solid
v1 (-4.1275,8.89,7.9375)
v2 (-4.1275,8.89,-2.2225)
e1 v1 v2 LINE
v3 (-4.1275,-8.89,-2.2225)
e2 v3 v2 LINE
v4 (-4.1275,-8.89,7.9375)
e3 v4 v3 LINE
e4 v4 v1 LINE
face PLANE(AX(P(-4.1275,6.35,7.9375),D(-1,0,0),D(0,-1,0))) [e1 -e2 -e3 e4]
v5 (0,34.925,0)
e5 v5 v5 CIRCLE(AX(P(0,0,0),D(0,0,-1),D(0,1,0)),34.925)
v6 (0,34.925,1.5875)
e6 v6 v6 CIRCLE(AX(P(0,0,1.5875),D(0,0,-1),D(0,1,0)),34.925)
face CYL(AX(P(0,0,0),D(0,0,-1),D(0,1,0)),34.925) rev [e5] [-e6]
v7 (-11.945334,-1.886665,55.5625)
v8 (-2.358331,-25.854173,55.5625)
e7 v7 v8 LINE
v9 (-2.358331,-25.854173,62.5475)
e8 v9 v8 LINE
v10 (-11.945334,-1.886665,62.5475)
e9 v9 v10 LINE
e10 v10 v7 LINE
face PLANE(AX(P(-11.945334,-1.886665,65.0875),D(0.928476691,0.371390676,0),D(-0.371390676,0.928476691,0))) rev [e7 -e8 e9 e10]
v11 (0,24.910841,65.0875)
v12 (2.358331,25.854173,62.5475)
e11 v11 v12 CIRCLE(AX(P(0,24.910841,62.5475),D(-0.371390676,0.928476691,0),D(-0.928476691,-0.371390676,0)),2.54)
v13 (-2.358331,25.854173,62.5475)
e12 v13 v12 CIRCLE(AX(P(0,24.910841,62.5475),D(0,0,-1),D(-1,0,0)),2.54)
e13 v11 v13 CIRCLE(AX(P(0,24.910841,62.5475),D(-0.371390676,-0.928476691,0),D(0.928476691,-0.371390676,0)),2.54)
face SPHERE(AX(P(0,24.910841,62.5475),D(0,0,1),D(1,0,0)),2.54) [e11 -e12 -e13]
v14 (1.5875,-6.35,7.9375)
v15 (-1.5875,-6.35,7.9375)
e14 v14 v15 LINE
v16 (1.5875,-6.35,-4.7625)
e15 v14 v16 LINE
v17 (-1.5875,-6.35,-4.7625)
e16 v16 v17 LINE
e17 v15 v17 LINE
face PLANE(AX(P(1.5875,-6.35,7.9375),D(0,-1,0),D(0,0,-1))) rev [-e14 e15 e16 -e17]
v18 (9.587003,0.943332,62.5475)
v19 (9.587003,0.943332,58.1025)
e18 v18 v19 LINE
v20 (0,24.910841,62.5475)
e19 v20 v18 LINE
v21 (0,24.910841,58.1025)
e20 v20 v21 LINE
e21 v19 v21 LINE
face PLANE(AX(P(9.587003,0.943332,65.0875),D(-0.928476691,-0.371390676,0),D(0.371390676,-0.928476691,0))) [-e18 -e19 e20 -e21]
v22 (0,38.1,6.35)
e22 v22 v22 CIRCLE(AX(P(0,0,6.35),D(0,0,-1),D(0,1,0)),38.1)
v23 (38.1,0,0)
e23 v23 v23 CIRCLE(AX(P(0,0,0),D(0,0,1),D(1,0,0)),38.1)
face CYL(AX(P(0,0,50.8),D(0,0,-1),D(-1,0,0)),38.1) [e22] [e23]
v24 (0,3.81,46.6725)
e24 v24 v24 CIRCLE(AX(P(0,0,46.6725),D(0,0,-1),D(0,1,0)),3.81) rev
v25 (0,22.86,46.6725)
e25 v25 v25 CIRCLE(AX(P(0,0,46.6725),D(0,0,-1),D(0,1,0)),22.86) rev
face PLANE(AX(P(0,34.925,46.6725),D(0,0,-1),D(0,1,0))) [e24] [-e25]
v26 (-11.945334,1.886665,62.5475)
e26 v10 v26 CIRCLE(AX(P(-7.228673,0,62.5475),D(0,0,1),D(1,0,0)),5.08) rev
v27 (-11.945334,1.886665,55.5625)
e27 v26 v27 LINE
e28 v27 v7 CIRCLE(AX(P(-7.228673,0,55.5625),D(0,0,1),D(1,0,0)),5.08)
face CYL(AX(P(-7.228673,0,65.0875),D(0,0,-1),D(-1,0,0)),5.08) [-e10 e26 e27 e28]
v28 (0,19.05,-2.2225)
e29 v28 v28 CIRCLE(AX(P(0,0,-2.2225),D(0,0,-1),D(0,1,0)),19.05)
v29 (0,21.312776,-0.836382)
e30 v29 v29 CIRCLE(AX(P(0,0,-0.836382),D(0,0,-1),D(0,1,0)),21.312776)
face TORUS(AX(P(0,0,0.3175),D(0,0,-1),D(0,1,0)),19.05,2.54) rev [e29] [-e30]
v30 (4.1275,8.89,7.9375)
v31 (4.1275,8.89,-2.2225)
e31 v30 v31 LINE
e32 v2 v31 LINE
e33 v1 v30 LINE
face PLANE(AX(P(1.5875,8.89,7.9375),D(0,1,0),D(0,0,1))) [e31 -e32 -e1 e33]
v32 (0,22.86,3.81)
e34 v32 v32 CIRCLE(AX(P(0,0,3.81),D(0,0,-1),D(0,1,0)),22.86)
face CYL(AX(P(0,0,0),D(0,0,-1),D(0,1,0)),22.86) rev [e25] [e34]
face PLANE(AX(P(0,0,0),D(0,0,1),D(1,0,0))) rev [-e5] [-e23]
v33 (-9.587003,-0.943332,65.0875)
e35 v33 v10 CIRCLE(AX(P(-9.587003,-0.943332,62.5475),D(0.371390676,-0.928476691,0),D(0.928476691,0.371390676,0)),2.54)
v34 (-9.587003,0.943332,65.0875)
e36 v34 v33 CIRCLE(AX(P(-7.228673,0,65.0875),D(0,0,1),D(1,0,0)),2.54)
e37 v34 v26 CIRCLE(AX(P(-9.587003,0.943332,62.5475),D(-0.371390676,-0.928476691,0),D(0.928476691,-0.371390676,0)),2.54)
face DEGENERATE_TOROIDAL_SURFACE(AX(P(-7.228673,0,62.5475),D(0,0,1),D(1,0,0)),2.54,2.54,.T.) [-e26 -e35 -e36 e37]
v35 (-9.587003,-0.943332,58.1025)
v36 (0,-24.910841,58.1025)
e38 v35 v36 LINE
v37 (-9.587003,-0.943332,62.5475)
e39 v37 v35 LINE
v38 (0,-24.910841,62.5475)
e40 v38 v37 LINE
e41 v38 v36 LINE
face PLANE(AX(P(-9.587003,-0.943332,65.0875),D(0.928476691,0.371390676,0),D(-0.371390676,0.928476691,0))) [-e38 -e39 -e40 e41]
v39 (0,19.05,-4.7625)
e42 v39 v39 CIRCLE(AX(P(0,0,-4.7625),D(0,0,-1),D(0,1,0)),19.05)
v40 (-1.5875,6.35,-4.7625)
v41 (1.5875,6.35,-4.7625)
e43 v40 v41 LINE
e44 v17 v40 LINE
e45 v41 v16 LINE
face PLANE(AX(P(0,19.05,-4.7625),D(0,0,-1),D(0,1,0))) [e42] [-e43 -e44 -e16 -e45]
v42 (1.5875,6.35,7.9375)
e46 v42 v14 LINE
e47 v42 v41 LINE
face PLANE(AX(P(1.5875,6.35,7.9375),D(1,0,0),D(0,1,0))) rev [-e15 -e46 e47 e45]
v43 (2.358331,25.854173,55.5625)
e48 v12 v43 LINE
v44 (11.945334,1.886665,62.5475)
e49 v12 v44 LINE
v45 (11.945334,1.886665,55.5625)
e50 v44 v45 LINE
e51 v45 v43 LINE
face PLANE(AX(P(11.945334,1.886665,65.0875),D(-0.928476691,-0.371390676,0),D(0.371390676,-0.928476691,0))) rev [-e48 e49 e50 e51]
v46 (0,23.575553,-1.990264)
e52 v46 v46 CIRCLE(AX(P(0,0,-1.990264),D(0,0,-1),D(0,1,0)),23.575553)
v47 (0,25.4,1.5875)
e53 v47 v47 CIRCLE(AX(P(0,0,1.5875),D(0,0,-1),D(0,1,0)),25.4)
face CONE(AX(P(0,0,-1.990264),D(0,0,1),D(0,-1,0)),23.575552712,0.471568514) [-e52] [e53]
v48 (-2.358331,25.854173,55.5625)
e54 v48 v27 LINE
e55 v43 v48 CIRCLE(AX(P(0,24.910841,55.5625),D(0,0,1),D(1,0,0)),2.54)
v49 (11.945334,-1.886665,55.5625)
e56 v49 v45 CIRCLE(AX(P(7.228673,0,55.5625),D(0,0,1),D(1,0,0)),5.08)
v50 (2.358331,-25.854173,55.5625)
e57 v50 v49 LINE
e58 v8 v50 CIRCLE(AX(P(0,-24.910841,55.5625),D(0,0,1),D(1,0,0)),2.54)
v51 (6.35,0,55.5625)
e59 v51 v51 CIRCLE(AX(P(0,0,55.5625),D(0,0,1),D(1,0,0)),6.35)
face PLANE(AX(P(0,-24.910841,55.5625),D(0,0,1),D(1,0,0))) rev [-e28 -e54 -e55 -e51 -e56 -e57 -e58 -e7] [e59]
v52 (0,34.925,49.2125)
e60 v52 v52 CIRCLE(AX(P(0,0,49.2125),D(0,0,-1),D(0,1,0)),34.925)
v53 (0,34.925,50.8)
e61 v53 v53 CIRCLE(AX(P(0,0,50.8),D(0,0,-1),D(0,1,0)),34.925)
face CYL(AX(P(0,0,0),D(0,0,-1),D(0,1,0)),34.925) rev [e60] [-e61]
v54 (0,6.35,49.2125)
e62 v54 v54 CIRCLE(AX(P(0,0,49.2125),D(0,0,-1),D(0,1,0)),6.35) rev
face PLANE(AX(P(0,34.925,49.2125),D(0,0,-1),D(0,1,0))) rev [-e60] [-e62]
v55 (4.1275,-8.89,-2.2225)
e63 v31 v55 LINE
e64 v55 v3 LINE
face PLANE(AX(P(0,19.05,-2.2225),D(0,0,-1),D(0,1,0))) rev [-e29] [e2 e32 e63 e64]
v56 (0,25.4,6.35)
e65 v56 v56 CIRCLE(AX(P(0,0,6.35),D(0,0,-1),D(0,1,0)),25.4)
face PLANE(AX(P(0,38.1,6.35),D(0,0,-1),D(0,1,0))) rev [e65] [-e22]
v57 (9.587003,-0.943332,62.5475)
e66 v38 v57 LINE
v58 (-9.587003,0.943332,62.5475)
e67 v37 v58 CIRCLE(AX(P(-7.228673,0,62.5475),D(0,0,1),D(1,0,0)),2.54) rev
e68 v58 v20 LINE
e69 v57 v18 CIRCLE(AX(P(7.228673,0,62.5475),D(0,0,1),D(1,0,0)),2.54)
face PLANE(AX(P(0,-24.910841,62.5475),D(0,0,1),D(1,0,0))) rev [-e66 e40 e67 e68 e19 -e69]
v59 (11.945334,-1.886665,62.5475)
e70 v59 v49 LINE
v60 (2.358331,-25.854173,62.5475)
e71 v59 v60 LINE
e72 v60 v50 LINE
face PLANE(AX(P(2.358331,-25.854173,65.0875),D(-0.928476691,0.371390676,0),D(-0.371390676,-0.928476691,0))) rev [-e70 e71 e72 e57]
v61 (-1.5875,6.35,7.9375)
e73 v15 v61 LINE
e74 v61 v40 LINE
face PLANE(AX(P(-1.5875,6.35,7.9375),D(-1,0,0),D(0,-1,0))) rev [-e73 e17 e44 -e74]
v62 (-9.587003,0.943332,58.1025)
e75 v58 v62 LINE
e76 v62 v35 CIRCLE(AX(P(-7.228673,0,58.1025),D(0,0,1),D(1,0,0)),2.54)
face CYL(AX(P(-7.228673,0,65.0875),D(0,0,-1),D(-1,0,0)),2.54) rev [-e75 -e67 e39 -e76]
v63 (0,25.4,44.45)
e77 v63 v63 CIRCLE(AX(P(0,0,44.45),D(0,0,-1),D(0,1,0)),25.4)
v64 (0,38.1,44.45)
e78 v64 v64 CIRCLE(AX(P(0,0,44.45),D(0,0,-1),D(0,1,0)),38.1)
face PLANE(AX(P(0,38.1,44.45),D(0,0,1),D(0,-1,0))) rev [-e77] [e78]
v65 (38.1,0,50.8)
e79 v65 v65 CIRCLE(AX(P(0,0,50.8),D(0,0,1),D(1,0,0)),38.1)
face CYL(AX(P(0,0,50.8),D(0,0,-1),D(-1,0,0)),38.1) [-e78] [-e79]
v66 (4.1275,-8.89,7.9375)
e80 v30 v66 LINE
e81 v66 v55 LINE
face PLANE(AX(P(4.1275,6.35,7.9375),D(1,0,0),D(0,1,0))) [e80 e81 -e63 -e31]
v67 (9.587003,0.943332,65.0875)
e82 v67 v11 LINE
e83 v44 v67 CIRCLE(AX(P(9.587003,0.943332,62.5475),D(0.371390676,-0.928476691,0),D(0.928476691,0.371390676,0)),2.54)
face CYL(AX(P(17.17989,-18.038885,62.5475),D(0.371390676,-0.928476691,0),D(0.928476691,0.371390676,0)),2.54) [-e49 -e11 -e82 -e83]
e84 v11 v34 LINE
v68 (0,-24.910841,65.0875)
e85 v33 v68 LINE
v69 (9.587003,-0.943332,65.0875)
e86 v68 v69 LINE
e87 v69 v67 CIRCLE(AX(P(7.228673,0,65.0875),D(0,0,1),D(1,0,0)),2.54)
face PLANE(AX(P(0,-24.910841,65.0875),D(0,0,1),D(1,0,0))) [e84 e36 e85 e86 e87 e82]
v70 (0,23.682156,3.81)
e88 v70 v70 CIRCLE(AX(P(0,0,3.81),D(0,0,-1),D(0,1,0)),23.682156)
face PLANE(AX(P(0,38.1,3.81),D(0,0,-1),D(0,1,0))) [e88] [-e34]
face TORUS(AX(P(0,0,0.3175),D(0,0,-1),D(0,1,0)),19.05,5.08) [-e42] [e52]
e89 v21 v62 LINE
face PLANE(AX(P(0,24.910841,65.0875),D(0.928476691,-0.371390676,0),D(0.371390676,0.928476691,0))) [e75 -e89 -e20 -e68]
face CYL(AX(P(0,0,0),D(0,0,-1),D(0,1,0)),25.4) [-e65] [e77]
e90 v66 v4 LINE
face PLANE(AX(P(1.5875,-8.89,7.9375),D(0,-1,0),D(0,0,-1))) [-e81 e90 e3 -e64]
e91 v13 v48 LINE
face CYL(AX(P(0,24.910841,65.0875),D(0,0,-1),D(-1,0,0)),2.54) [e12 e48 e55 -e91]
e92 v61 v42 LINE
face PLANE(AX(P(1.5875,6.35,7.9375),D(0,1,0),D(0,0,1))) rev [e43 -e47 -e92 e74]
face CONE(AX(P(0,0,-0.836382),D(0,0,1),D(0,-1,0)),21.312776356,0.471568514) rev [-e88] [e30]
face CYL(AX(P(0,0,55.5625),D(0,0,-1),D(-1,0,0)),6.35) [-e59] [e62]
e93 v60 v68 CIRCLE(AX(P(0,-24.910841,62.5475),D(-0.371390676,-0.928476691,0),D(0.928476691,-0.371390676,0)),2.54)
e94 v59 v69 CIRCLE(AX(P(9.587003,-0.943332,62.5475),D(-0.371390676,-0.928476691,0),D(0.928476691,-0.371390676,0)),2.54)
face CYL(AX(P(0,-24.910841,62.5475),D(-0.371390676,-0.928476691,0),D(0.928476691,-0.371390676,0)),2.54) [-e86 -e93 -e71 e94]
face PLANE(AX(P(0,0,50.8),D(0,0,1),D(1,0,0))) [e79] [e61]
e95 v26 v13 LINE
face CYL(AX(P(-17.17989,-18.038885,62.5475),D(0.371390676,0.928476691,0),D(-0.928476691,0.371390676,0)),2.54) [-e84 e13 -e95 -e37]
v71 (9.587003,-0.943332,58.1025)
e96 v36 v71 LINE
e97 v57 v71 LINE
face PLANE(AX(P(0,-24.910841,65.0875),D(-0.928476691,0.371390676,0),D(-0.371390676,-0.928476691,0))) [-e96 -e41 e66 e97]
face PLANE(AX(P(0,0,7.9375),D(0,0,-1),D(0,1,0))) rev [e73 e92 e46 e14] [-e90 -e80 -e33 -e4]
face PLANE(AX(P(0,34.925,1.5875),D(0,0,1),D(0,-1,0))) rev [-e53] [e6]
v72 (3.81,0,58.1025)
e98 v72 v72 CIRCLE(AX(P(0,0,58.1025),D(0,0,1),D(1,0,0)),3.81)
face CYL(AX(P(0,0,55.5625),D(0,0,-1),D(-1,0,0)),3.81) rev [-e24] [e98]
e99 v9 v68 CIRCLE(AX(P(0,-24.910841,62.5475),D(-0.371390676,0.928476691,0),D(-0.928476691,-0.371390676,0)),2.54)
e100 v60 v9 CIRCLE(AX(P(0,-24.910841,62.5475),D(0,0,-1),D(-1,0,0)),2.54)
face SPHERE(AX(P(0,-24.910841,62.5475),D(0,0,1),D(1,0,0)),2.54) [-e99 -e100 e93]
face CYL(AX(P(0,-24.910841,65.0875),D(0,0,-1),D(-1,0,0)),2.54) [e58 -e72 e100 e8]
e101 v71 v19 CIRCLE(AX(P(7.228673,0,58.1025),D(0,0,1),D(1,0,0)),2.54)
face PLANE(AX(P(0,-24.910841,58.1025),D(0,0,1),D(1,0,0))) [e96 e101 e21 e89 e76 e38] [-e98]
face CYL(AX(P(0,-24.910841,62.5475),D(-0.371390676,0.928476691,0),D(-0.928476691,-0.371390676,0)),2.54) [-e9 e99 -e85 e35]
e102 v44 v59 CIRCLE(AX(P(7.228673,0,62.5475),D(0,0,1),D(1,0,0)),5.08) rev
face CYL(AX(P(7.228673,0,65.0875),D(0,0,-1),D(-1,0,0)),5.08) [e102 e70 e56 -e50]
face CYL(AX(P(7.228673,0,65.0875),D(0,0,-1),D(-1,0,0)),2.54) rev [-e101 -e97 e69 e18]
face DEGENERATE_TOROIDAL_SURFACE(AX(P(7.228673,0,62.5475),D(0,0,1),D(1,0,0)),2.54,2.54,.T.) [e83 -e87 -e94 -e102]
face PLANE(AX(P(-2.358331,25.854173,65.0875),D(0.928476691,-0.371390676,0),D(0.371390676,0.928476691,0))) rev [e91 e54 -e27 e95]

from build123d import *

# Parameters (mm, degrees)
SKETCH1_R           = 38.1
BOSS_EXTRUDE1_DEPTH = 50.8
SKETCH2_W           = 38.1
SKETCH2_H           = 12.7
SKETCH2_W_2         = 1.5875
SKETCH2_H_2         = 34.925
SKETCH4_R           = 6.35
BOSS_EXTRUDE2_DEPTH = 6.35
BOSS_EXTRUDE3_DEPTH = 9.525
FILLET1_R           = 2.54
SKETCH6_W           = 3.175
SKETCH6_H           = 12.7
CUT_EXTRUDE1_DEPTH  = 12.7
SHELL1_START        = 3.81
SHELL1_OUTLINE_R    = 22.86
SHELL1_OUTLINE_W    = 8.255
SHELL1_OUTLINE_H    = 17.78
SHELL1_DEPTH        = 42.8625
SHELL1_START_2      = 7.9375
SHELL1_2_OUTLINE_W  = 8.255
SHELL1_2_OUTLINE_H  = 17.78
SHELL1_2_DEPTH      = 38.735
SHELL1_START_3      = 58.1025
SHELL1_3_DEPTH      = 4.445
SHELL1_START_4      = 46.6725
SHELL1_4_OUTLINE_R  = 3.81
SHELL1_4_DEPTH      = 11.43
SHELL1_START_5      = -2.2225
SHELL1_6_OUTLINE_R  = 19.05
SHELL1_6_OUTLINE_W  = 8.255
SHELL1_6_OUTLINE_H  = 17.78
SHELL1_6_DEPTH      = 6.0325


with BuildPart() as part:
    # Sketch1 → Boss-Extrude1 (new body)
    with BuildSketch(Plane.XY):
        Circle(SKETCH1_R)
    extrude(amount=BOSS_EXTRUDE1_DEPTH)

    # Sketch2 → Cut-Revolve1 (revolve, cut)
    with BuildSketch(Plane(origin=(0, 0, 0), x_dir=(0, 0, -1), z_dir=(1, 0, 0))):
        with Locations((-25.4, 31.75)):
            Rectangle(SKETCH2_W, SKETCH2_H)
        with Locations((-0.79375, 17.4625)):
            Rectangle(SKETCH2_W_2, SKETCH2_H_2)
        with Locations((-50.00625, 17.4625)):
            Rectangle(SKETCH2_W_2, SKETCH2_H_2)
    revolve(axis=Axis((0, 0, 0), (0, 0, 1)), mode=Mode.SUBTRACT)

    # Sketch3 → Revolve1 (revolve)
    with BuildSketch(Plane(origin=(0, 0, 0), x_dir=(0, 0, -1), z_dir=(1, 0, 0))):
        with BuildLine():
            Line((4.7625, 19.05), (4.7625, 0))
            Line((4.7625, 0), (-1.5875, 0))
            Line((-1.5875, 0), (-1.5875, 25.4))
            Line((-1.5875, 25.4), (1.99026356, 23.575552712))
            ThreePointArc((1.99026356, 23.575552712), (4.014349425, 21.703578821), (4.7625, 19.05))
        make_face()
    revolve(axis=Axis((0, 0, -4.7625), (0, 0, 1)))

    # Sketch4 → Boss-Extrude2 (add)
    with BuildSketch(Plane.XY.offset(49.2125)):
        with Locations(Location((0, 0, 0), (0, 0, 90))):
            Circle(SKETCH4_R)
    extrude(amount=BOSS_EXTRUDE2_DEPTH)

    # Sketch5 → Boss-Extrude3 (add)
    with BuildSketch(Plane.XY.offset(55.5625)):
        with BuildLine():
            Line((-2.358330795, 25.854173013), (-11.945334146, 1.886664636))
            ThreePointArc((-11.945334146, 1.886664636), (-12.308672556, 0), (-11.945334146, -1.886664636))
            Line((-11.945334146, -1.886664636), (-2.358330795, -25.854173013))
            ThreePointArc((-2.358330795, -25.854173013), (0, -27.450840695), (2.358330795, -25.854173013))
            Line((2.358330795, -25.854173013), (11.945334146, -1.886664636))
            ThreePointArc((11.945334146, -1.886664636), (12.308672556, 0), (11.945334146, 1.886664636))
            Line((11.945334146, 1.886664636), (2.358330795, 25.854173013))
            ThreePointArc((2.358330795, 25.854173013), (0, 27.450840695), (-2.358330795, 25.854173013))
        make_face()
    extrude(amount=BOSS_EXTRUDE3_DEPTH)

    # Fillet1
    fillet1_edges = [part.edges().sort_by_distance(p)[0] for p in [
        (0, -27.450840695, 65.0875),
        (7.15183247, -13.870418824, 65.0875),
        (12.308672556, 0, 65.0875),
        (7.15183247, 13.870418824, 65.0875),
        (0, 27.450840695, 65.0875),
        (-7.15183247, 13.870418824, 65.0875),
        (-12.308672556, 0, 65.0875),
        (-7.15183247, -13.870418824, 65.0875),
    ]]
    fillet(fillet1_edges, radius=FILLET1_R)

    # Sketch6 → Cut-Extrude1 (cut)
    with BuildSketch(Plane(origin=(0, 0, -4.7625), x_dir=(-1, 0, 0), z_dir=(0, 0, -1))):
        Rectangle(SKETCH6_W, SKETCH6_H)
    extrude(amount=-CUT_EXTRUDE1_DEPTH, mode=Mode.SUBTRACT)

    # Shell1: read off the stored shape, not the designer's step
    # Shell1 outline → Shell1 (cut)
    with BuildSketch(Plane.XY.offset(SHELL1_START)):
        Circle(SHELL1_OUTLINE_R)
        Rectangle(SHELL1_OUTLINE_W, SHELL1_OUTLINE_H, mode=Mode.SUBTRACT)
    extrude(amount=SHELL1_DEPTH, mode=Mode.SUBTRACT)

    # Shell1 2 outline → Shell1 2 (cut)
    with BuildSketch(Plane.XY.offset(SHELL1_START_2)):
        Rectangle(SHELL1_2_OUTLINE_W, SHELL1_2_OUTLINE_H)
    extrude(amount=SHELL1_2_DEPTH, mode=Mode.SUBTRACT)

    # Shell1 3 outline → Shell1 3 (cut)
    with BuildSketch(Plane.XY.offset(SHELL1_START_3)):
        with BuildLine():
            Line((9.587003351, 0.943332318), (0, 24.910840695))
            Line((0, 24.910840695), (-9.587003351, 0.943332318))
            ThreePointArc((-9.587003351, 0.943332318), (-9.768672556, 0), (-9.587003351, -0.943332318))
            Line((-9.587003351, -0.943332318), (0, -24.910840695))
            Line((0, -24.910840695), (9.587003351, -0.943332318))
            ThreePointArc((9.587003351, -0.943332318), (9.768672556, 0), (9.587003351, 0.943332318))
        make_face()
    extrude(amount=SHELL1_3_DEPTH, mode=Mode.SUBTRACT)

    # Shell1 4 outline → Shell1 4 (cut)
    with BuildSketch(Plane.XY.offset(SHELL1_START_4)):
        Circle(SHELL1_4_OUTLINE_R)
    extrude(amount=SHELL1_4_DEPTH, mode=Mode.SUBTRACT)

    # Shell1 5 outline → Shell1 5 (revolve, cut)
    with BuildSketch(Plane.XZ):
        with BuildLine():
            ThreePointArc((19.05, -2.2225), (20.37678941, -1.848424713), (21.312776356, -0.83638178))
            Line((21.312776356, -0.83638178), (23.682155577, 3.81))
            Line((23.682155577, 3.81), (19.05, 3.81))
            Line((19.05, 3.81), (19.05, -2.2225))
        make_face()
    revolve(axis=Axis((0, 0, 0), (0, 0, 1)), mode=Mode.SUBTRACT)

    # Shell1 6 outline → Shell1 6 (cut)
    with BuildSketch(Plane.XY.offset(SHELL1_START_5)):
        Circle(SHELL1_6_OUTLINE_R)
        Rectangle(SHELL1_6_OUTLINE_W, SHELL1_6_OUTLINE_H, mode=Mode.SUBTRACT)
    extrude(amount=SHELL1_6_DEPTH, mode=Mode.SUBTRACT)


solid = part.part
